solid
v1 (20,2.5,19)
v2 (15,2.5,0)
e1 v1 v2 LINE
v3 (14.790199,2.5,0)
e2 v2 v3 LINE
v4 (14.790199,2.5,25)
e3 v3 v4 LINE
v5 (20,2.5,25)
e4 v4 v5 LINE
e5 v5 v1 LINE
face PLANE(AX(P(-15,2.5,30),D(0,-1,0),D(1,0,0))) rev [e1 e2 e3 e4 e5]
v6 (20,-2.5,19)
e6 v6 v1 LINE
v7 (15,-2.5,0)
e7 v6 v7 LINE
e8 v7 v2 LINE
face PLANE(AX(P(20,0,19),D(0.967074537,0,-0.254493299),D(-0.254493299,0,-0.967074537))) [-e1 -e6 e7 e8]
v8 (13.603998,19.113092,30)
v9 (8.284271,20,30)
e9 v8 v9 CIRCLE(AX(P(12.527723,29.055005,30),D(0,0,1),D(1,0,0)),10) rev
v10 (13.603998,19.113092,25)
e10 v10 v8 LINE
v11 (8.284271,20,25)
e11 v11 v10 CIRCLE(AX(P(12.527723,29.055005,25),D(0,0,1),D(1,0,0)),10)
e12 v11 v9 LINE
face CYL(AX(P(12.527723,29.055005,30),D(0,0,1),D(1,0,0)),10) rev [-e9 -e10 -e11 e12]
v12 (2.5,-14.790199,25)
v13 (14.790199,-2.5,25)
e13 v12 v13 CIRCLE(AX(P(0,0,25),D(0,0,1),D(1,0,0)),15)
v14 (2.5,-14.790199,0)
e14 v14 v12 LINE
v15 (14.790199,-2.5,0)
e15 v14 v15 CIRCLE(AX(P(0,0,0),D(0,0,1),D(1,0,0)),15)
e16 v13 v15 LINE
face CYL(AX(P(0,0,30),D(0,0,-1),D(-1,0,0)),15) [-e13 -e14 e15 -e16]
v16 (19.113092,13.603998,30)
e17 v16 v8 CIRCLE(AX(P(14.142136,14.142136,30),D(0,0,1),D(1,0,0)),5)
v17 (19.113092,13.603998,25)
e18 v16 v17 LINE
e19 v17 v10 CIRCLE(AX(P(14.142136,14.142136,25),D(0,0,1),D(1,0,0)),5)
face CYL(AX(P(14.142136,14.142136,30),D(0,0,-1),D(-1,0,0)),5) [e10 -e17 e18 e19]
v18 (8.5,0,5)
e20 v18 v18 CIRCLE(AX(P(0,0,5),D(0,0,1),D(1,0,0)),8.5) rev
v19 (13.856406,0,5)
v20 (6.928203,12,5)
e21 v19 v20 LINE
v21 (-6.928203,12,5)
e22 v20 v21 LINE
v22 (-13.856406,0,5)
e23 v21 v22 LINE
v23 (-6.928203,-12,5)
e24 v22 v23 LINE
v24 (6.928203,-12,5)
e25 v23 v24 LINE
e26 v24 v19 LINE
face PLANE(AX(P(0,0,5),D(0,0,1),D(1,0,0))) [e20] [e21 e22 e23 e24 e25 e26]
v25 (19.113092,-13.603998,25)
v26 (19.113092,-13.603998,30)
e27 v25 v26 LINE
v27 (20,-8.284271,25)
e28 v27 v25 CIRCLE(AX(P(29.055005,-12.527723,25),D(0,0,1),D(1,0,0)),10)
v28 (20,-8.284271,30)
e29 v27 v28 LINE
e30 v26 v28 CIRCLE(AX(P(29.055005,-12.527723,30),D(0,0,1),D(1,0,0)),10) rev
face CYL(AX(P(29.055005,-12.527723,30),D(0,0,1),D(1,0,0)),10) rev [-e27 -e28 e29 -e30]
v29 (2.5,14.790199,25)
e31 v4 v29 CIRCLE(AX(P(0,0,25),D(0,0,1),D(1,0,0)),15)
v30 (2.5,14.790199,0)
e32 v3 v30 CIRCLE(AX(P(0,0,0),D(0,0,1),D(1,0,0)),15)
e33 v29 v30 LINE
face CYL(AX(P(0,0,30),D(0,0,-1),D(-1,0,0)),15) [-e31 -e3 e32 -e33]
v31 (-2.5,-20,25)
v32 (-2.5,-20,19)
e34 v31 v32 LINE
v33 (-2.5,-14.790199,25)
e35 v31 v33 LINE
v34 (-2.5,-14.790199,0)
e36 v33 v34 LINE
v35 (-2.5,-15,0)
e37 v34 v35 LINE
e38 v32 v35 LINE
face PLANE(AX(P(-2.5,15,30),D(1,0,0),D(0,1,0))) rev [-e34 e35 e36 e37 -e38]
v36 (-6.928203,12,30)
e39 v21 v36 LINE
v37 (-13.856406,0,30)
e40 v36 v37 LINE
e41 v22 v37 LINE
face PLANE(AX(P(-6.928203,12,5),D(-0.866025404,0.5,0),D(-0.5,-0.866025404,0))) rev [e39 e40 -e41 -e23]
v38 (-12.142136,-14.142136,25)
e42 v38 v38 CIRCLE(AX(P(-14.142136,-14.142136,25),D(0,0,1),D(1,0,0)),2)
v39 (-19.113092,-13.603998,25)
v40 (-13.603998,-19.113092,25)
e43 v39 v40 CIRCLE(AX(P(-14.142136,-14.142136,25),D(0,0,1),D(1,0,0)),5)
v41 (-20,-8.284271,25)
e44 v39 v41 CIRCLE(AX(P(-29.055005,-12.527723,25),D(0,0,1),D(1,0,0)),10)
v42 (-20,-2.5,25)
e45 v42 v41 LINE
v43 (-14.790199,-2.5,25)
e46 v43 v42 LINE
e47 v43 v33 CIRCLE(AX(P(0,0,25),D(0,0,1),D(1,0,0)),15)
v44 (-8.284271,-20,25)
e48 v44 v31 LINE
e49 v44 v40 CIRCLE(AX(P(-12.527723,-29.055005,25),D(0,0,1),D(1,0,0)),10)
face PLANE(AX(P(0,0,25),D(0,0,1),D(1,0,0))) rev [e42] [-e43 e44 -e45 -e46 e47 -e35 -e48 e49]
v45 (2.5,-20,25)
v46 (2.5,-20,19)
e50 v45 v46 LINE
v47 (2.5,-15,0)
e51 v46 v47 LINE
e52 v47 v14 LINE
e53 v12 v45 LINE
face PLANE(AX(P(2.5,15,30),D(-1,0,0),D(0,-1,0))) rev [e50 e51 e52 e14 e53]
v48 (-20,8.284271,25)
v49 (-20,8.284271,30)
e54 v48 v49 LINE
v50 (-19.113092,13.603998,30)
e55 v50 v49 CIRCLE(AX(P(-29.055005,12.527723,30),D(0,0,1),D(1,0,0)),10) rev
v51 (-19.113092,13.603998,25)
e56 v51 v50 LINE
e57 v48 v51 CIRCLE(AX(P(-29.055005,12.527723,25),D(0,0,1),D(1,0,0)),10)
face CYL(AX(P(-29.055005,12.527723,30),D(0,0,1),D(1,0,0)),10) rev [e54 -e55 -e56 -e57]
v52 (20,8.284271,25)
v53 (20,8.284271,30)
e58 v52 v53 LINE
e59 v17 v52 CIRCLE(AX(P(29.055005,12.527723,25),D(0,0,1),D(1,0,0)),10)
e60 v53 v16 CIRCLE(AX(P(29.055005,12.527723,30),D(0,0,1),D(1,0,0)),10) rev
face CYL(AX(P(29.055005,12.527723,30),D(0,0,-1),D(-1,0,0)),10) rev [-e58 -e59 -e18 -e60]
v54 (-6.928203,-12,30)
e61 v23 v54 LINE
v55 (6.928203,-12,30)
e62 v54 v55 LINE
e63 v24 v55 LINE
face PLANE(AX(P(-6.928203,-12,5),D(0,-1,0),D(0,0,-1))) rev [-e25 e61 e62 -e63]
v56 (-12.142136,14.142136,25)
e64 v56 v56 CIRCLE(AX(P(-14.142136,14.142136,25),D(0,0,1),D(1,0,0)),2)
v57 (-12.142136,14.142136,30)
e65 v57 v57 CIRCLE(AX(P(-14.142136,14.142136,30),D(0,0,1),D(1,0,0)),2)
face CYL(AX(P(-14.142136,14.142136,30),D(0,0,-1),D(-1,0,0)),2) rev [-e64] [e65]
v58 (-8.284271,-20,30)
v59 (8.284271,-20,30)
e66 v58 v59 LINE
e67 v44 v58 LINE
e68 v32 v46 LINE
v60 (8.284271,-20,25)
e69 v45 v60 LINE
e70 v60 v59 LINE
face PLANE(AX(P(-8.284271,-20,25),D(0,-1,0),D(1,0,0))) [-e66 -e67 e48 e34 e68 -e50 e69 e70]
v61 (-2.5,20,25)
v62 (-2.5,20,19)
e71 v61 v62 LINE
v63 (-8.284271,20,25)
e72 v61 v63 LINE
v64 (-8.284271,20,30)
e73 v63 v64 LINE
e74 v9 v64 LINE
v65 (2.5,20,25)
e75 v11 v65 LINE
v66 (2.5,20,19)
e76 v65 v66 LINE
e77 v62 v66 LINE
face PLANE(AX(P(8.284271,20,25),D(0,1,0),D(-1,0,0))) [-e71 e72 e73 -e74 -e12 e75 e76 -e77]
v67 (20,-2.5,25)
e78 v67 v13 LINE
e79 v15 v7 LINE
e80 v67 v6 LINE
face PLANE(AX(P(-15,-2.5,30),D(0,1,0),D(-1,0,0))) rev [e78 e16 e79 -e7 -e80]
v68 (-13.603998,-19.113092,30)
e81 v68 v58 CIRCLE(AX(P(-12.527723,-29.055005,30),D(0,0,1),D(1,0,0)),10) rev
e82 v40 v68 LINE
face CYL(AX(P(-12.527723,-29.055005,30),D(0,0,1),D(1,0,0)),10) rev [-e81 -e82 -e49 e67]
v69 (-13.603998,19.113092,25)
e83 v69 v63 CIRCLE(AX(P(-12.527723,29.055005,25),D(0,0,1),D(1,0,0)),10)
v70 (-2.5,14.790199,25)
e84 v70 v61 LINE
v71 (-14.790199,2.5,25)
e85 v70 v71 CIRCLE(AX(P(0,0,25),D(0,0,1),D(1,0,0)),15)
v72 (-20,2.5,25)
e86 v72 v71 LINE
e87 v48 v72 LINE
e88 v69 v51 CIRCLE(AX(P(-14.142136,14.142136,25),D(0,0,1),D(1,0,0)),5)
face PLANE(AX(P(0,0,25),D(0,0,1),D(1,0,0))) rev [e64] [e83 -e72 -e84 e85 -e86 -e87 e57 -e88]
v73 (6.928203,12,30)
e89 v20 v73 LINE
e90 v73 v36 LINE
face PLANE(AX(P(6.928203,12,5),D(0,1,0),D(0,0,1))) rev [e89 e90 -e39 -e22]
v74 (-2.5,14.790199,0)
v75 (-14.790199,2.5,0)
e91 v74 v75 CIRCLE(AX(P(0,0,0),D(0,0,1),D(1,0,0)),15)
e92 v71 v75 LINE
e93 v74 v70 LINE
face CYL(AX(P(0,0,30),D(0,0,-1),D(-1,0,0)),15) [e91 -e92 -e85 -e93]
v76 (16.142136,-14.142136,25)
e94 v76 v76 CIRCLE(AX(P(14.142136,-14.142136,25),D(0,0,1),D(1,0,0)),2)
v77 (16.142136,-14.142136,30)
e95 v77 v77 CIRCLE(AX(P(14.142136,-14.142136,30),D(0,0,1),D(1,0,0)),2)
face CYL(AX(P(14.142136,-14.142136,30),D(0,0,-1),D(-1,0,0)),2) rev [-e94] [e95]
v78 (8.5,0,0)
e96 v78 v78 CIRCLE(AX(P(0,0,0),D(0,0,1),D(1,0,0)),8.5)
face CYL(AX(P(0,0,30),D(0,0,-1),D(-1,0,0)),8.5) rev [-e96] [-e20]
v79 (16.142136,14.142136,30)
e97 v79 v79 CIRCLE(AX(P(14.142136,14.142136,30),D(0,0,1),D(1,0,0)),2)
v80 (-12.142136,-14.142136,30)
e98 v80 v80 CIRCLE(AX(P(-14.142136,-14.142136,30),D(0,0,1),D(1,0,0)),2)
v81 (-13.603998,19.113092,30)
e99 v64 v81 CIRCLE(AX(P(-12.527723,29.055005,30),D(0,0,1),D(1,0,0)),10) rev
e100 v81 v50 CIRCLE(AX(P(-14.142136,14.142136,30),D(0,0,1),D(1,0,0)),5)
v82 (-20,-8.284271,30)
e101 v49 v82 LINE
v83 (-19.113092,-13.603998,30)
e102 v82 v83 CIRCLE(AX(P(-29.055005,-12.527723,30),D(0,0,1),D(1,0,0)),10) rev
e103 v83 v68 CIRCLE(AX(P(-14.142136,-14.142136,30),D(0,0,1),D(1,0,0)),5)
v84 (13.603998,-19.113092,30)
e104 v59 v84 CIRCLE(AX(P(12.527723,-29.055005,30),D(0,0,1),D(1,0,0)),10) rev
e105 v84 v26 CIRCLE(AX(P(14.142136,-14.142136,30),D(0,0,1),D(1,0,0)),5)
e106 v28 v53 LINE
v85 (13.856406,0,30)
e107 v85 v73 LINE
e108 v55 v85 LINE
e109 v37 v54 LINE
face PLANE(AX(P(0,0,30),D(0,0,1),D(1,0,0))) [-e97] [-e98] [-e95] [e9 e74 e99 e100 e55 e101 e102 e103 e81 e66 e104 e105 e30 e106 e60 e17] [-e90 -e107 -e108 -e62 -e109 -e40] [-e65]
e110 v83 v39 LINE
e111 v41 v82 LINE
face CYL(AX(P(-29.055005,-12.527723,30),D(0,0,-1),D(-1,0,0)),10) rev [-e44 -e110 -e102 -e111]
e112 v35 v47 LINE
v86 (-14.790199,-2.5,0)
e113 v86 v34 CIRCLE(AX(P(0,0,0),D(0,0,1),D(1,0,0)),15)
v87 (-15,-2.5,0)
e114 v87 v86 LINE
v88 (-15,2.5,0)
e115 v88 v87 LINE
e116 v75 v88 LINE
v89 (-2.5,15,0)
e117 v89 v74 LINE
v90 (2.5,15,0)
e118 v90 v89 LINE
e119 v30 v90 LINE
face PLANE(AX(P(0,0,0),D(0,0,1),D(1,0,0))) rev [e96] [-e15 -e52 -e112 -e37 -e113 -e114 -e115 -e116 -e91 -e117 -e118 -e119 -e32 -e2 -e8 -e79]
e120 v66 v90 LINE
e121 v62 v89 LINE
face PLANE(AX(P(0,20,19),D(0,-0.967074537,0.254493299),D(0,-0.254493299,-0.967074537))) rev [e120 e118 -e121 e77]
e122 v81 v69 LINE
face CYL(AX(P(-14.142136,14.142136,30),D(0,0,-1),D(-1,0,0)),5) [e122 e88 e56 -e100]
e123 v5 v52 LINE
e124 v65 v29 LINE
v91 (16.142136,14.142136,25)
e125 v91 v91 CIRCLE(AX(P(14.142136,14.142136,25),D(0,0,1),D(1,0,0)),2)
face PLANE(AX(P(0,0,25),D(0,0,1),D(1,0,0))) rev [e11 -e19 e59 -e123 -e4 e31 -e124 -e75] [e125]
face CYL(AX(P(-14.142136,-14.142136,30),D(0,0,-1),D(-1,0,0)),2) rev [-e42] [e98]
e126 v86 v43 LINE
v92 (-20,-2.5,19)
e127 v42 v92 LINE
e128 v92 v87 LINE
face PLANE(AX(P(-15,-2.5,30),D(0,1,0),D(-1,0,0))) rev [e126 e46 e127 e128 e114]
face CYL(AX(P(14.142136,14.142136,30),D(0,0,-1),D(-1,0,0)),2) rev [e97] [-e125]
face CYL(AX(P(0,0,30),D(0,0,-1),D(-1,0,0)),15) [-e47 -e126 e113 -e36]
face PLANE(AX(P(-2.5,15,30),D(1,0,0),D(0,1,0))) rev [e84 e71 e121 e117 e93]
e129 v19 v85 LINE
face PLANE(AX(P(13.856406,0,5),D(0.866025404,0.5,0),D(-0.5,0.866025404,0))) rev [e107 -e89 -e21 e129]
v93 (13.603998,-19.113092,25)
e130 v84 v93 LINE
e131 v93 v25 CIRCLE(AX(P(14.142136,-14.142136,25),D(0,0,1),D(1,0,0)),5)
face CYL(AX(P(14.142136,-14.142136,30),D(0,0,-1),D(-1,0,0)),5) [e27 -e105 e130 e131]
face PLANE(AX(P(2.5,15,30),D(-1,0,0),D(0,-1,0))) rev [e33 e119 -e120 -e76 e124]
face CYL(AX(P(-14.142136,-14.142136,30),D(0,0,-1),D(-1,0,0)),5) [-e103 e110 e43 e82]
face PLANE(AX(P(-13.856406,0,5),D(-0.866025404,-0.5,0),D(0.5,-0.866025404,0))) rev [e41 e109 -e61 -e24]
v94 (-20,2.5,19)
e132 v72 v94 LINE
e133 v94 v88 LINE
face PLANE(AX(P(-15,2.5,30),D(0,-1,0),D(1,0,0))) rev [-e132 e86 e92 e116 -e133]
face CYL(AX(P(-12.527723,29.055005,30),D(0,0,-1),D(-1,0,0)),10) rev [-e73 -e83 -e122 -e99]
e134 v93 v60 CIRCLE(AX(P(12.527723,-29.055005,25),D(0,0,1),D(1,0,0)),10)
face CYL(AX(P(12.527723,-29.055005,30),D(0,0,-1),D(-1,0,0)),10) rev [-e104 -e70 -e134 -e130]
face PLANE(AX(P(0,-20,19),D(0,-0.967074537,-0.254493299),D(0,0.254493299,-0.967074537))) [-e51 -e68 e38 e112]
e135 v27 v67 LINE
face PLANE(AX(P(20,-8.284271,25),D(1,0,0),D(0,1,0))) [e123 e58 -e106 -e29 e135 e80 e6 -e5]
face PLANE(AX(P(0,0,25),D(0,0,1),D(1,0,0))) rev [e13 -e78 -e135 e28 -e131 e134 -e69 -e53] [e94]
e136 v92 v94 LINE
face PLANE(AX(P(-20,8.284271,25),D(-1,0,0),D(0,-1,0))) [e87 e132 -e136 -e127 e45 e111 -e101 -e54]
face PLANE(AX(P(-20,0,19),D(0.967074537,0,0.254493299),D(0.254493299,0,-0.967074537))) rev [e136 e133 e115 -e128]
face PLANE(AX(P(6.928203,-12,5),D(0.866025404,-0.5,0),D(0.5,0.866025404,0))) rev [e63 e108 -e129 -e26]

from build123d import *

# Parameters (mm, degrees)
SKETCH_1_R                      = 15
EXTRUDE_1_DEPTH                 = 30
EXTRUDE_3_DEPTH                 = 5
SKETCH_6_W                      = 5
SKETCH_6_H                      = 30
EXTRUDE_4_DEPTH                 = 30
RIB_START                       = -2.5
RIB_3_DEPTH                     = 5
PATTERN_CIRCULAR_1_COUNT        = 2
PATTERN_CIRCULAR_1_ANGLE        = 90
PATTERN_START                   = -2.5
PATTERN_CIRCULAR_1_COPY_1_DEPTH = 5
CUT_EXTRUDE_1_DEPTH             = 25
SKETCH_9_R                      = 8.5
CUT_EXTRUDE_3_DEPTH             = 42.231056256
EXTRUDE_START                   = 25
SKETCH_10_R                     = 5
SKETCH_10_R_2                   = 2
EXTRUDE_5_DEPTH                 = 5
SKETCH_10_2_R                   = 2
CUT_EXTRUDE_4_DEPTH             = 42.231056256
FILLET_1_R                      = 10


# Read off the part's stored shape, not the designer's step: 筋3
with BuildPart() as part:
    # 草图1 → 凸台-拉伸1 (new body)
    with BuildSketch(Plane.XY):
        Circle(SKETCH_1_R)
    extrude(amount=EXTRUDE_1_DEPTH)

    # 草图3 → 凸台-拉伸3 (add)
    with BuildSketch(Plane.XY.offset(30)):
        Polygon((20, -8.284271247), (20, 8.284271247), (8.284271247, 20), (-8.284271247, 20), (-20, 8.284271247), (-20, -8.284271247), (-8.284271247, -20), (8.284271247, -20), align=None)
    extrude(amount=-EXTRUDE_3_DEPTH)

    # 草图6 → 凸台-拉伸4 (add, through all)
    with BuildSketch(Plane.XY):
        Rectangle(SKETCH_6_W, SKETCH_6_H)
    extrude_4 = extrude(amount=EXTRUDE_4_DEPTH)

    # 筋3 outline → 筋3 (add)
    with BuildSketch(Plane(origin=(0, 0, 0), x_dir=(0, 0, -1), z_dir=(1, 0, 0)).offset(RIB_START)):
        Polygon((0, 15), (-19, 20), (-25, 20), (-25, 15), align=None)
    rib_3 = extrude(amount=RIB_3_DEPTH)

    # 镜向1: 筋3 across plane
    add(rib_3.mirror(Plane.ZX))

    # 阵列(圆周)1: 凸台-拉伸4, 筋3 ×2 about axis
    pattern_circular_1_axis = Axis((0, 0, 0), (0, 0, 1))
    add([extrude_4.rotate(pattern_circular_1_axis, i * PATTERN_CIRCULAR_1_ANGLE / (PATTERN_CIRCULAR_1_COUNT - 1)) for i in range(1, PATTERN_CIRCULAR_1_COUNT)])
    add([rib_3.rotate(pattern_circular_1_axis, i * PATTERN_CIRCULAR_1_ANGLE / (PATTERN_CIRCULAR_1_COUNT - 1)) for i in range(1, PATTERN_CIRCULAR_1_COUNT)])

    # 阵列(圆周)1 copy 1 sketch → 阵列(圆周)1 copy 1 (add)
    with BuildSketch(Plane(origin=(0, 0, 0), x_dir=(0, 0, -1), z_dir=(0, 1, 0)).offset(PATTERN_START)):
        Polygon((0, -15), (-19, -20), (-25, -20), (-25, -15), align=None)
    extrude(amount=PATTERN_CIRCULAR_1_COPY_1_DEPTH)

    # 草图8 → 切除-拉伸1 (cut)
    with BuildSketch(Plane.XY.offset(30)):
        Polygon((6.92820323, 12), (-6.92820323, 12), (-13.856406461, 0), (-6.92820323, -12), (6.92820323, -12), (13.856406461, 0), align=None)
    extrude(amount=-CUT_EXTRUDE_1_DEPTH, mode=Mode.SUBTRACT)

    # 草图9 → 切除-拉伸3 (cut, through all)
    with BuildSketch(Plane.XY):
        Circle(SKETCH_9_R)
    extrude(amount=CUT_EXTRUDE_3_DEPTH, mode=Mode.SUBTRACT)

    # 草图10 → 凸台-拉伸5 (add, through all)
    # profile 1 of 4: a face of its own
    with BuildSketch(Plane.XY.offset(EXTRUDE_START)):
        with Locations((14.142135624, 14.142135624)):
            Circle(SKETCH_10_R)
        with Locations((14.142135624, 14.142135624)):
            Circle(SKETCH_10_R_2, mode=Mode.SUBTRACT)
    # profile 2 of 4: a face of its own
    with BuildSketch(Plane.XY.offset(EXTRUDE_START)):
        with Locations((14.142135624, -14.142135624)):
            Circle(SKETCH_10_R)
        with Locations((14.142135624, -14.142135624)):
            Circle(SKETCH_10_R_2, mode=Mode.SUBTRACT)
    # profile 3 of 4: a face of its own
    with BuildSketch(Plane.XY.offset(EXTRUDE_START)):
        with Locations((-14.142135624, -14.142135624)):
            Circle(SKETCH_10_R)
        with Locations((-14.142135624, -14.142135624)):
            Circle(SKETCH_10_R_2, mode=Mode.SUBTRACT)
    # profile 4 of 4: a face of its own
    with BuildSketch(Plane.XY.offset(EXTRUDE_START)):
        with Locations((-14.142135624, 14.142135624)):
            Circle(SKETCH_10_R)
        with Locations((-14.142135624, 14.142135624)):
            Circle(SKETCH_10_R_2, mode=Mode.SUBTRACT)
    extrude(amount=EXTRUDE_5_DEPTH)

    # 草图10<2> → 切除-拉伸4 (cut, through all)
    with BuildSketch(Plane.XY):
        with Locations((-14.142135624, 14.142135624)):
            Circle(SKETCH_10_2_R)
        with Locations((14.142135624, 14.142135624)):
            Circle(SKETCH_10_2_R)
        with Locations((14.142135624, -14.142135624)):
            Circle(SKETCH_10_2_R)
        with Locations((-14.142135624, -14.142135624)):
            Circle(SKETCH_10_2_R)
    extrude(amount=CUT_EXTRUDE_4_DEPTH, mode=Mode.SUBTRACT)

    # 圆角1
    # the kernel refuses this fillet: 10 mm, written as the material it adds along each edge
    with BuildSketch(Plane(origin=(10.606601718, -17.67766953, 30), x_dir=(0.9019133199255954, -0.4319170792418269, 0), z_dir=(0, 0, -1)), Plane(origin=(17.67766953, 10.606601718, 30), x_dir=(0.43191707924182504, 0.9019133199255963, 0), z_dir=(0, 0, -1)), Plane(origin=(-10.606601718, 17.67766953, 30), x_dir=(-0.9019133199255949, 0.4319170792418281, 0), z_dir=(0, 0, -1)), Plane(origin=(-17.67766953, -10.606601718, 30), x_dir=(-0.43191707924182854, -0.9019133199255946, 0), z_dir=(0, 0, -1))) as fillet_1_piece_1:
        with BuildLine():
            CenterArc((6.646750578, 9.431605202), FILLET_1_R, 219.30149192, 31.287792541)
            Line((-1.091486591, 3.097594978), (-1.246251334, 2.970914774))
            ThreePointArc((-1.246251334, 2.970914774), (-0.734375399, 1.482329983), (-0.188632104, -0.066467506))
            Line((-0.188632104, -0.066467506), (0.066467506, -0.188632104))
            ThreePointArc((0.066467506, -0.188632104), (1.661687645, 0.084197399), (3.256907783, -0.188632104))
            Line((3.256907783, -0.188632104), (3.323375289, 0))
        make_face()
    extrude(amount=5)
    with BuildSketch(Plane(origin=(17.67766953, -10.606601718, 30), x_dir=(0.4319170792418248, -0.9019133199255964, 0), z_dir=(0, 0, -1))) as fillet_1_piece_2:
        with BuildLine():
            CenterArc((6.646750578, -9.431605202), FILLET_1_R, 109.410715538, 31.287792541)
            Line((-1.091486591, -3.097594978), (-1.246251334, -2.970914774))
            ThreePointArc((-1.246251334, -2.970914774), (-0.734375399, -1.482329983), (-0.188632104, 0.066467506))
            Line((-0.188632104, 0.066467506), (0.066467506, 0.188632104))
            ThreePointArc((0.066467506, 0.188632104), (1.661687645, -0.084197399), (3.256907783, 0.188632104))
            Line((3.256907783, 0.188632104), (3.323375289, 0))
        make_face()
    extrude(amount=5)
    with BuildSketch(Plane(origin=(10.606601718, 17.67766953, 30), x_dir=(-0.7071067811865472, 0.7071067811865478, 0), z_dir=(0, 0, -1)), Plane(origin=(-17.67766953, 10.606601718, 30), x_dir=(-0.7071067811865486, -0.7071067811865465, 0), z_dir=(0, 0, -1)), Plane(origin=(-10.606601718, -17.67766953, 30), x_dir=(0.7071067811865476, -0.7071067811865476, 0), z_dir=(0, 0, -1))) as fillet_1_piece_3:
        with BuildLine():
            CenterArc((6.686553006, 9.4034291), FILLET_1_R, 218.821431077, 31.287792541)
            Line((-1.104482331, 3.134476367), (-1.260303038, 3.009097312))
            ThreePointArc((-1.260303038, 3.009097312), (-0.472829503, 1.595220139), (-0.2, 0))
            Line((-0.2, 0), (0, -0.2))
            ThreePointArc((0, -0.2), (1.642135624, -0.2), (3.216225612, -0.188068582))
            Line((3.216225612, -0.188068582), (3.284271247, 0))
        make_face()
    extrude(amount=5)


solid = part.part
